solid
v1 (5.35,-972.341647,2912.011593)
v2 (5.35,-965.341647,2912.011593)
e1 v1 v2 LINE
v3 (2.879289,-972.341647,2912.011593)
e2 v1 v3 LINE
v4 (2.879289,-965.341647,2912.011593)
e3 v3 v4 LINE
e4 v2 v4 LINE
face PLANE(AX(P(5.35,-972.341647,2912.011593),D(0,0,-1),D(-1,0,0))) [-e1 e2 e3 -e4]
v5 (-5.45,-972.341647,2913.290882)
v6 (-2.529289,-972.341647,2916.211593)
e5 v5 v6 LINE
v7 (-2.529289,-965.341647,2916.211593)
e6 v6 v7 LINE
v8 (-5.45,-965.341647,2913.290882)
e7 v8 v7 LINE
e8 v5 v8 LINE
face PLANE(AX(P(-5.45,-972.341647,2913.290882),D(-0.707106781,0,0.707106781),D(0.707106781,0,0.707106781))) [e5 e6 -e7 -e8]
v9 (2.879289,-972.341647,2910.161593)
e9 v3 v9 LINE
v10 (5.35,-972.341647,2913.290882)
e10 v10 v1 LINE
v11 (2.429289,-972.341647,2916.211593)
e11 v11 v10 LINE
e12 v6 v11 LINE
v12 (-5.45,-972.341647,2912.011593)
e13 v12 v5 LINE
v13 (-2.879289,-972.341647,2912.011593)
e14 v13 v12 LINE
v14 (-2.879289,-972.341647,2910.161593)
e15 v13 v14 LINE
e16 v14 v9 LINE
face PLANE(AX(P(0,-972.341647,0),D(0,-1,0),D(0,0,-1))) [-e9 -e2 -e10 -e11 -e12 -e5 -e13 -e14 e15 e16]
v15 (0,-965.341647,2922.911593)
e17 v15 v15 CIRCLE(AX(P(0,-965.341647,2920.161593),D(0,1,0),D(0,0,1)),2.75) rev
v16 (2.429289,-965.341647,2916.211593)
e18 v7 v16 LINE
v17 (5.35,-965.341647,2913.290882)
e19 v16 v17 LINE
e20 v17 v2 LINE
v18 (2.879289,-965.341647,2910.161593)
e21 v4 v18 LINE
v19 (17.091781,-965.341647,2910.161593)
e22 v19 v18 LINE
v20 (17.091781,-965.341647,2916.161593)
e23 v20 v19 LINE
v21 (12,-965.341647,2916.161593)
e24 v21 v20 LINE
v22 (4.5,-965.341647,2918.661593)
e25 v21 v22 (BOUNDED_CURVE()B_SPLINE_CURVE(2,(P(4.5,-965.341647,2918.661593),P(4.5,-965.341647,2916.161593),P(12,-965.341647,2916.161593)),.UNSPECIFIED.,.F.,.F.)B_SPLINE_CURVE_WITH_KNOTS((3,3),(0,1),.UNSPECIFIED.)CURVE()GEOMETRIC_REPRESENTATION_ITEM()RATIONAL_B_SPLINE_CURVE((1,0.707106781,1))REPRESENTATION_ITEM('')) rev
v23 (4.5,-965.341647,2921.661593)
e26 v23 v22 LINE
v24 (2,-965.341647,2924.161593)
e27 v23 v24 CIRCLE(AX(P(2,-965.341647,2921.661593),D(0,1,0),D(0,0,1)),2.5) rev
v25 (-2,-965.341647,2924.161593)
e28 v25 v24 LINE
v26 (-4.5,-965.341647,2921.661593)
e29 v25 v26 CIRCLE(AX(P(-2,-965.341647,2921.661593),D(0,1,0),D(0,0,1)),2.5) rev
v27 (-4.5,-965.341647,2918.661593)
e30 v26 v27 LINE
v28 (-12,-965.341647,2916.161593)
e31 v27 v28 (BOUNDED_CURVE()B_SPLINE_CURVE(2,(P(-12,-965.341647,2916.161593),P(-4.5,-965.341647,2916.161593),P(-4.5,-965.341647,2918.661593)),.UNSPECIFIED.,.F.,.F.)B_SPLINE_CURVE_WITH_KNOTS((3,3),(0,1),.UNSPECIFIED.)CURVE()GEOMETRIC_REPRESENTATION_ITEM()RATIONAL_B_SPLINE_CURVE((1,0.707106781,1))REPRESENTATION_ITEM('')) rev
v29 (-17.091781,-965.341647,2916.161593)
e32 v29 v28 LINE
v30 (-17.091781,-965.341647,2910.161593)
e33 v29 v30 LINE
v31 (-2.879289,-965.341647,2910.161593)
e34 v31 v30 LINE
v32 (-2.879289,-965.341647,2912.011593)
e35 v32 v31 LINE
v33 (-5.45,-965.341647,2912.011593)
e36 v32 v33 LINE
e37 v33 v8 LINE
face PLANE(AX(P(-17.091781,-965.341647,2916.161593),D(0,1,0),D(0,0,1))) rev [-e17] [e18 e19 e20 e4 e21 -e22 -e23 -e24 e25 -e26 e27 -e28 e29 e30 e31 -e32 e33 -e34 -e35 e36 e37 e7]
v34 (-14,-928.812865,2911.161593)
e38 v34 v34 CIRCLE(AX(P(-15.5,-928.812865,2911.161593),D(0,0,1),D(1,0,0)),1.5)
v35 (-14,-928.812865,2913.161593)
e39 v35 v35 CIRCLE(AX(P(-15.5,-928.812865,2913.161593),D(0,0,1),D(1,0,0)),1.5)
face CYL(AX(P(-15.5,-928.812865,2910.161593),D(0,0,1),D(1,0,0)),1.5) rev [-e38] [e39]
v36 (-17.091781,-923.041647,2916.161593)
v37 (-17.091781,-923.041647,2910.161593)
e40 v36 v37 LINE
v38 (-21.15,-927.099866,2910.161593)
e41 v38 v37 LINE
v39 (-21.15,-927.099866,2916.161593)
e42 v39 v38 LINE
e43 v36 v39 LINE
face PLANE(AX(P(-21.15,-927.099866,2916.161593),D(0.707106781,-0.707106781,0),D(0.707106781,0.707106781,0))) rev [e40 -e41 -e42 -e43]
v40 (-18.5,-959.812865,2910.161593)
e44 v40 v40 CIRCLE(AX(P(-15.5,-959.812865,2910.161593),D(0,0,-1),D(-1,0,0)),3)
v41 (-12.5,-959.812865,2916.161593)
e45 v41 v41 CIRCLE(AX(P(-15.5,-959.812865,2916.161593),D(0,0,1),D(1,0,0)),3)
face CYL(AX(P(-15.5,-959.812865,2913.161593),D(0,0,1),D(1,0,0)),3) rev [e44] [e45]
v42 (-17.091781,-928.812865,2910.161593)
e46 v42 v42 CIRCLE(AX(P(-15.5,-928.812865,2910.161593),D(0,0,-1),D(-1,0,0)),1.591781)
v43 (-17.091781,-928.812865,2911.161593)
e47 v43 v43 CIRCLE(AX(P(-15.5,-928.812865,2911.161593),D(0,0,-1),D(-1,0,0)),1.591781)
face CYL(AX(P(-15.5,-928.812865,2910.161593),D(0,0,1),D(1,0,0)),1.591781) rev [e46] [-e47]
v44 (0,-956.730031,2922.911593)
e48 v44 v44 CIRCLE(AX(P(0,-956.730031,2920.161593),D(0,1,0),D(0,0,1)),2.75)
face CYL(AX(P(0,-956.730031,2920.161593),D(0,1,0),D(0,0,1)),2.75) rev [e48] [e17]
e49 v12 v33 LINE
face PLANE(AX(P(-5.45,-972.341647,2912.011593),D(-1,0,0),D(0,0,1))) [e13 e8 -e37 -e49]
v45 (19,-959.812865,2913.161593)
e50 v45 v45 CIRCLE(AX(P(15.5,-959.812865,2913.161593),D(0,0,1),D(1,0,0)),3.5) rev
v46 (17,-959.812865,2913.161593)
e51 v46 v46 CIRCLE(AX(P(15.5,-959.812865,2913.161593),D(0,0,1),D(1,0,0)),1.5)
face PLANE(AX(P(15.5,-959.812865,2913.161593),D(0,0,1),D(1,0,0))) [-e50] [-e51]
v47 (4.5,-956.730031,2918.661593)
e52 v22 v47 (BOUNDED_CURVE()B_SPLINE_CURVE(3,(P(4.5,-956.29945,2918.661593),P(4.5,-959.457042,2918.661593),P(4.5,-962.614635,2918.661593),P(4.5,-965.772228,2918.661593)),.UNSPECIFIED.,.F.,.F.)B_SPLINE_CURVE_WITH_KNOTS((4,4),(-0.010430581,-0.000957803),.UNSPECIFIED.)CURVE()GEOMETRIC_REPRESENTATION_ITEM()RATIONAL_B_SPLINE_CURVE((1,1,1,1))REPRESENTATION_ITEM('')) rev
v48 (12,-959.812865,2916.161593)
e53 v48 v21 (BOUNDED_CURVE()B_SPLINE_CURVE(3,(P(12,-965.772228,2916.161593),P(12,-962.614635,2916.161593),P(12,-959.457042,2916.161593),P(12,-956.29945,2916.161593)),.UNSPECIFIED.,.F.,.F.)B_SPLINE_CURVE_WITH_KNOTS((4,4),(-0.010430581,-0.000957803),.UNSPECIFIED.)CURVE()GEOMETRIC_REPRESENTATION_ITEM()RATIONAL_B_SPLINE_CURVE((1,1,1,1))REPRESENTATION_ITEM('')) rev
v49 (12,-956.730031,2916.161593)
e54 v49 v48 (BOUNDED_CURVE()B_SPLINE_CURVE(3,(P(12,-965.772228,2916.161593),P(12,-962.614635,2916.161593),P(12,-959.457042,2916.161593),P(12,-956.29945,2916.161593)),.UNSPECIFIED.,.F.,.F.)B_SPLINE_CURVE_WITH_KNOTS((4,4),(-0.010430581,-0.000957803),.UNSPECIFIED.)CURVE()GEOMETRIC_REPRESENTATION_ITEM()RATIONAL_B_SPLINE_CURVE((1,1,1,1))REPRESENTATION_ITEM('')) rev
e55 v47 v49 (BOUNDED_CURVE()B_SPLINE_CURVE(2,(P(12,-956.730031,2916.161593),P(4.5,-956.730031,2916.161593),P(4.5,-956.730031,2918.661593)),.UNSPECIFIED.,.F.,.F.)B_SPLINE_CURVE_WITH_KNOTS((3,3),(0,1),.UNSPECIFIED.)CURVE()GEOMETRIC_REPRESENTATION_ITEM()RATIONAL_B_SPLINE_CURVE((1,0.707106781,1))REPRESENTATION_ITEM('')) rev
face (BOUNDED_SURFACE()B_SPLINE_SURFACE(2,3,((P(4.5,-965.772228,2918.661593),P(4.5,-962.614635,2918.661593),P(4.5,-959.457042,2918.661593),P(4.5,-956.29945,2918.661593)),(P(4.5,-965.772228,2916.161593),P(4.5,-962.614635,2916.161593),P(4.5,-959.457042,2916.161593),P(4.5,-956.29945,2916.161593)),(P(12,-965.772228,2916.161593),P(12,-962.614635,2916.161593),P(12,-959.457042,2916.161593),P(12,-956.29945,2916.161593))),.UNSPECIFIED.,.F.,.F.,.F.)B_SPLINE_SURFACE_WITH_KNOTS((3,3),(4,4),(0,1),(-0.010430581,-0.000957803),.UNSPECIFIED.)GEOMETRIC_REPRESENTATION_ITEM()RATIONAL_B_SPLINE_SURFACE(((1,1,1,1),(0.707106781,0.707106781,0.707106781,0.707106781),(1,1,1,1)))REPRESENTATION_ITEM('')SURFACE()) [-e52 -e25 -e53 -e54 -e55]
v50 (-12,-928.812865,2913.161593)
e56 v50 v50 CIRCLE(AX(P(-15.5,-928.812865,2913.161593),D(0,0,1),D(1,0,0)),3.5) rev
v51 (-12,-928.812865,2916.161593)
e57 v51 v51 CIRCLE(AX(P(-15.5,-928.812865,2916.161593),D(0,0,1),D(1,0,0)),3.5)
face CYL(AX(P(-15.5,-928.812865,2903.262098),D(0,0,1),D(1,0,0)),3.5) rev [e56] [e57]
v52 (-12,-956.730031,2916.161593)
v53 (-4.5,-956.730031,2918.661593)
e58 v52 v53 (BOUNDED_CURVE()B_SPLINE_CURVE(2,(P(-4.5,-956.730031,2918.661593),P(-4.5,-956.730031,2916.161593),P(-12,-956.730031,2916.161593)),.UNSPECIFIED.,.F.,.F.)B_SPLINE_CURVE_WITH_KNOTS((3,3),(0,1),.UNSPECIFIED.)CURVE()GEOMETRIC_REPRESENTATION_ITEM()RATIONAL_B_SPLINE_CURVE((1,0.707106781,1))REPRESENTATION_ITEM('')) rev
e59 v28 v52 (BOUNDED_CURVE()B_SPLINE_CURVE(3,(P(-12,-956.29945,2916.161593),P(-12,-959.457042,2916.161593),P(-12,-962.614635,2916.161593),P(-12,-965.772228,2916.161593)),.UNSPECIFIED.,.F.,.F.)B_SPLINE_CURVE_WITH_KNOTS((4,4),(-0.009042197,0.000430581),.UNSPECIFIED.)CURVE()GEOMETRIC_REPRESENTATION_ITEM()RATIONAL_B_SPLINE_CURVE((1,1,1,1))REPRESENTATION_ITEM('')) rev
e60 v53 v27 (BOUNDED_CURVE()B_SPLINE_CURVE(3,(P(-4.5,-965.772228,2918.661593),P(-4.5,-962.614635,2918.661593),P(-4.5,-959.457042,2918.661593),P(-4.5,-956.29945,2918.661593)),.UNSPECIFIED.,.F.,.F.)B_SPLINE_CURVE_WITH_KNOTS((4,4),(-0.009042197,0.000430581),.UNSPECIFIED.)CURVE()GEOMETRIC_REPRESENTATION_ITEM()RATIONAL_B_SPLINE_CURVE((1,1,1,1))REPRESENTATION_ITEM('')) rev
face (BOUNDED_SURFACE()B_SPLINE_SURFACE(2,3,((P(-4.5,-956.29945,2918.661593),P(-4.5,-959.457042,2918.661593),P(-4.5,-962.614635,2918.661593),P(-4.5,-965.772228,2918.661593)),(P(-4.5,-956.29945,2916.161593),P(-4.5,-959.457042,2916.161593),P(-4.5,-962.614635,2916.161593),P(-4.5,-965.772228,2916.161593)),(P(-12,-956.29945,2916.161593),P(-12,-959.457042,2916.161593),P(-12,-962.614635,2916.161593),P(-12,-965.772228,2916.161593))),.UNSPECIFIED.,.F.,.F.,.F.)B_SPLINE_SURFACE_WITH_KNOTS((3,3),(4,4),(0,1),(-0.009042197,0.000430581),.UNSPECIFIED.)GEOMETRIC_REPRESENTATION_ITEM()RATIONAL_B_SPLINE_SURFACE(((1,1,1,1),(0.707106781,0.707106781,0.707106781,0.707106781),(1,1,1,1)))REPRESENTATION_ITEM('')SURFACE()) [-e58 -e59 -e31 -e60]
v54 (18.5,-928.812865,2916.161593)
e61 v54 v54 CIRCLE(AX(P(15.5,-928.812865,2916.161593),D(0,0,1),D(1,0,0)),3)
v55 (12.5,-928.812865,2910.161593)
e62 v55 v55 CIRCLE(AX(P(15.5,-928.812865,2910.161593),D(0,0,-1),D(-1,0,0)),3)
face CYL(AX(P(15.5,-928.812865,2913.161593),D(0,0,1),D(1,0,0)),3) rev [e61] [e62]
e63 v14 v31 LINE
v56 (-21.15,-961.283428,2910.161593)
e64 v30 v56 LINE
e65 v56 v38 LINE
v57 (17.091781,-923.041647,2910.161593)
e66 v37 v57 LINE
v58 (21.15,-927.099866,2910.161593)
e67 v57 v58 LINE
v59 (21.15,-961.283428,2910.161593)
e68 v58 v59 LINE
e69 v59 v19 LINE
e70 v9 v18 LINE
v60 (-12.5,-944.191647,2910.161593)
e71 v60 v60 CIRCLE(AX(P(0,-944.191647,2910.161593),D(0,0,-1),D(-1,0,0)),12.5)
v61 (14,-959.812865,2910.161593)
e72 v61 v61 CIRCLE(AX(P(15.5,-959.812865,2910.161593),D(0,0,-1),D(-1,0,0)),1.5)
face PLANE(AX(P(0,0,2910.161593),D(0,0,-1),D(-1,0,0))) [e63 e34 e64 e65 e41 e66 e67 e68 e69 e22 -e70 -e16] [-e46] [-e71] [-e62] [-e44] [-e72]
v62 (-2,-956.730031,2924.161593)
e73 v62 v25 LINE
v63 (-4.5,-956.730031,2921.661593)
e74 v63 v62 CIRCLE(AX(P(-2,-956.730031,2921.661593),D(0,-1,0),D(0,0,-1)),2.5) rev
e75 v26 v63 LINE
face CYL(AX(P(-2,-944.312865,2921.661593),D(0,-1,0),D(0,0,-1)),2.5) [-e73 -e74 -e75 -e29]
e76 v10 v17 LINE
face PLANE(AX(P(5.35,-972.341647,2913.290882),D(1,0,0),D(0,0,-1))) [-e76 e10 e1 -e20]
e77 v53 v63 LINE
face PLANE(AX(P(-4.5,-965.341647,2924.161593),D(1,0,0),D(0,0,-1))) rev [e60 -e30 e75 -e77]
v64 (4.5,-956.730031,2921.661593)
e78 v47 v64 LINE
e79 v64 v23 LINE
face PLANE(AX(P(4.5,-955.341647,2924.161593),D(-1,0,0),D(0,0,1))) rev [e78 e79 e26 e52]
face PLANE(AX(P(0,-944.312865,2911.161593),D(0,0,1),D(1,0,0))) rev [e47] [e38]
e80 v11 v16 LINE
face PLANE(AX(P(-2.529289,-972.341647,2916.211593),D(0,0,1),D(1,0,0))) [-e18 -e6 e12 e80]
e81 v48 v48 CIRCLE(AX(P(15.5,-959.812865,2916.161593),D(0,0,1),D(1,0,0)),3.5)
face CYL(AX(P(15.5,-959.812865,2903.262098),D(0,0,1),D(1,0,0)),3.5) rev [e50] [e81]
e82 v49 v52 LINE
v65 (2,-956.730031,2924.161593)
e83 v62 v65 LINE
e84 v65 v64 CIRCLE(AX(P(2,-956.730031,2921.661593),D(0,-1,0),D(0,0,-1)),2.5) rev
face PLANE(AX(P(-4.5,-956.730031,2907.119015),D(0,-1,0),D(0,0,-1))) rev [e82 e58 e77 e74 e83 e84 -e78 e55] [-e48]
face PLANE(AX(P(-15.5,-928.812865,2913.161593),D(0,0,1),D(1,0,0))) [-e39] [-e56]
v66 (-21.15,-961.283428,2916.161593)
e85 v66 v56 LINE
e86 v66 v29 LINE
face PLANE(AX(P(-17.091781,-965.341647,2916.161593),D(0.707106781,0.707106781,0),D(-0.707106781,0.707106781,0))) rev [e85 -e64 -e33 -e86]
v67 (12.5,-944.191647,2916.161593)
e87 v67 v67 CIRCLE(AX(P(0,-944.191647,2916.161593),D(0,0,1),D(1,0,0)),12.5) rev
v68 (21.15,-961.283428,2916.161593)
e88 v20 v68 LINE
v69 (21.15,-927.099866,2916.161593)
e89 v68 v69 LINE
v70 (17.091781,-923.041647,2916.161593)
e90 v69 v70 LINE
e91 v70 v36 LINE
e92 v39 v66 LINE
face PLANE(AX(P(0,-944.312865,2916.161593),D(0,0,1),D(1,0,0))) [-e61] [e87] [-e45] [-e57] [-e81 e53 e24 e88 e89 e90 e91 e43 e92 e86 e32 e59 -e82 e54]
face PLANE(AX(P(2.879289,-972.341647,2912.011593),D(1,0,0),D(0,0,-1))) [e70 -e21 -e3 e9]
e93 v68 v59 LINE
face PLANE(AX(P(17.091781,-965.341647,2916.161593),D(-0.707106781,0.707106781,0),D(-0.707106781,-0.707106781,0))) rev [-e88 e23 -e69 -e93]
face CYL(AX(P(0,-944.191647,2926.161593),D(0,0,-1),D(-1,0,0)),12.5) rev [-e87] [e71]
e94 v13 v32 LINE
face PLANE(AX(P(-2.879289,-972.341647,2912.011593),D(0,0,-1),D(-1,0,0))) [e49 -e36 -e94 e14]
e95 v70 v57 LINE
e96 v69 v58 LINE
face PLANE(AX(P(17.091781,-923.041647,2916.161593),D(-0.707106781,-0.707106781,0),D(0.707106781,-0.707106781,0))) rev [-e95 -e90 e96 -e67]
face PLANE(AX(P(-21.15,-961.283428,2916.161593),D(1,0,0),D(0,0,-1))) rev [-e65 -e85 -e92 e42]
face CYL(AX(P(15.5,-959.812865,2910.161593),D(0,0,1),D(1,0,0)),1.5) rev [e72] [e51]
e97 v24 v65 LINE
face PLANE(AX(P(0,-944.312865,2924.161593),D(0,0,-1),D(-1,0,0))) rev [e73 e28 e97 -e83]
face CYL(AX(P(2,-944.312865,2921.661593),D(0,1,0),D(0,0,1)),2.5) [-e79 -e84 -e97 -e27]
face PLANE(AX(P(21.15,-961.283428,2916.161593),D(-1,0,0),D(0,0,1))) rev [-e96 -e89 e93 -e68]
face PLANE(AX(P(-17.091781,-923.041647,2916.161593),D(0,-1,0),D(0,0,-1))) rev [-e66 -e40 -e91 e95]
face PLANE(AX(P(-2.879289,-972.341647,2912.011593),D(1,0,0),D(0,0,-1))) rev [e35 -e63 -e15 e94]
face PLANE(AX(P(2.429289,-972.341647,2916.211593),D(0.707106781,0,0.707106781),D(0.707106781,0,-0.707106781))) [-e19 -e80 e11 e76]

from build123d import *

# Parameters (mm, degrees)
SKETCH1_R                    = 11025
BOSS_EXTRUDE1_DEPTH          = 5000
BOSS_EXTRUDE2_DEPTH          = 8000
SKETCH4_R                    = 3000
CUT_EXTRUDE2_DEPTH           = 3000
SKETCH5_R                    = 1500
CUT_EXTRUDE3_DEPTH           = 3000
SKETCH6_R                    = 3000
CUT_EXTRUDE4_DEPTH           = 3000
SKETCH3_R                    = 2900
CUT_EXTRUDE1_DEPTH           = 12018
SCALE6_SCALE                 = 0.001
CORTAR_EXTRUIR1_DEPTH        = 10
CORTAR_EXTRUIR1_DEPTH_BACK   = 10
CROQUIS1_R                   = 12.5
CROQUIS2_W                   = 9
CROQUIS2_H                   = 0.876479878
CORTAR_EXTRUIR2_DEPTH        = 8
CROQUIS4_R                   = 2.9
CROQUIS4_R_2                 = 2.4
SALIENTE_EXTRUIR2_DEPTH      = 8.611616332
CROQUIS5_R                   = 3.5
CORTAR_EXTRUIR3_DEPTH        = 3
CROQUIS6_R                   = 1.591781054
CROQUIS6_R_2                 = 3
CROQUIS6_R_3                 = 1.5
CROQUIS6_R_4                 = 12.5
SALIENTE_EXTRUIR3_DEPTH      = 1
REDONDEO1_R                  = 2.5
TALADRO_DE_MARGEN_PARA_M51_D = 5.5
SALIENTE_EXTRUIR4_DEPTH      = 7
REDONDEO2_SIZE               = 2.5
REDONDEO2_SIZE_2             = 7.5


with BuildPart() as part:
    # Sketch1 → Boss-Extrude1 (new body)
    with BuildSketch(Plane.XY):
        Polygon((-21150, 17212.99935917), (-17091.781053823, 21271.218305346), (17091.781053823, 21271.218305346), (21150, 17212.99935917), (21150, -16970.562748477), (17091.781053823, -21028.781694654), (-17091.781053823, -21028.781694654), (-21150, -16970.562748477), align=None)
        with Locations((0, 121.218305346)):
            Circle(SKETCH1_R, mode=Mode.SUBTRACT)
    extrude(amount=BOSS_EXTRUDE1_DEPTH)

    # Sketch2 → Boss-Extrude2 (add)
    with BuildSketch(Plane.XY.offset(5000)):
        Polygon((0, -11028.781694654), (4500, -11028.781694654), (4500, -21028.781694654), (-4500, -21028.781694654), (-4500, -11028.781694654), align=None)
    extrude(amount=BOSS_EXTRUDE2_DEPTH)

    # Sketch4 → Cut-Extrude2 (cut)
    with BuildSketch(Plane.XY.offset(5000)):
        with Locations((-15500, 15500)):
            Circle(SKETCH4_R)
        with Locations((15500, 15500)):
            Circle(SKETCH4_R)
        with Locations((15500, -15500)):
            Circle(SKETCH4_R)
        with Locations((-15500, -15500)):
            Circle(SKETCH4_R)
    extrude(amount=-CUT_EXTRUDE2_DEPTH, mode=Mode.SUBTRACT)

    # Sketch5 → Cut-Extrude3 (cut)
    with BuildSketch(Plane.XY.offset(2000)):
        with Locations((-15500, 15500)):
            Circle(SKETCH5_R)
        with Locations((15500, -15500)):
            Circle(SKETCH5_R)
    extrude(amount=-CUT_EXTRUDE3_DEPTH, mode=Mode.SUBTRACT)

    # Sketch6 → Cut-Extrude4 (cut)
    with BuildSketch(Plane.XY.offset(2000)):
        with Locations((15500, 15500)):
            Circle(SKETCH6_R)
        with Locations((-15500, -15500)):
            Circle(SKETCH6_R)
    extrude(amount=-CUT_EXTRUDE4_DEPTH, mode=Mode.SUBTRACT)

    # Sketch3 → Cut-Extrude1 (cut)
    with BuildSketch(Plane.XZ.offset(21028.781694654)):
        with Locations(Location((0, 9000, 0), (0, 0, 270))):
            Circle(SKETCH3_R)
    extrude(amount=-CUT_EXTRUDE1_DEPTH, mode=Mode.SUBTRACT)


with BuildPart() as part_1:
    # Scale6: scaled about (0, -945.258123271, 2914.075668663)
    add(part.part.scale(SCALE6_SCALE).moved(Location((0, -944.312865148, 2911.161592994))))

    # Croquis1 → Cortar-Extruir1 (cut, two sides: drawn at the far end of the back side and taken through both)
    with BuildSketch(Plane.XY.offset(2916.161592994).offset(-CORTAR_EXTRUIR1_DEPTH_BACK)):
        with Locations(Location((0, -944.191646843, 0), (0, 0, 248.899803976))):
            Circle(CROQUIS1_R)
    extrude(amount=CORTAR_EXTRUIR1_DEPTH + CORTAR_EXTRUIR1_DEPTH_BACK, mode=Mode.SUBTRACT)

    # Croquis2 → Cortar-Extruir2 (cut)
    with BuildSketch(Plane.XY.offset(2924.161592994)):
        with Locations((0, -956.291790571)):
            Rectangle(CROQUIS2_W, CROQUIS2_H)
    extrude(amount=-CORTAR_EXTRUIR2_DEPTH, mode=Mode.SUBTRACT)

    # Croquis4 → Saliente-Extruir2 (add)
    with BuildSketch(Plane.XZ.offset(965.341646843)):
        with Locations((0, 2920.161592994)):
            Circle(CROQUIS4_R)
        with Locations(Location((0, 2920.161592994, 0), (0, 0, 270))):
            Circle(CROQUIS4_R_2, mode=Mode.SUBTRACT)
    extrude(amount=-SALIENTE_EXTRUIR2_DEPTH)

    # Croquis5 → Cortar-Extruir3 (cut)
    with BuildSketch(Plane.XY.offset(2916.161592994)):
        with Locations((-15.5, -928.812865148)):
            Circle(CROQUIS5_R)
        with Locations((15.5, -959.812865148)):
            Circle(CROQUIS5_R)
    extrude(amount=-CORTAR_EXTRUIR3_DEPTH, mode=Mode.SUBTRACT)

    # Croquis6 → Saliente-Extruir3 (add)
    with BuildSketch(Plane(origin=(0, 0, 2911.161592994), x_dir=(-1, 0, 0), z_dir=(0, 0, -1))):
        Polygon((17.091781054, -923.041646843), (-17.091781054, -923.041646843), (-21.15, -927.099865789), (-21.15, -961.283427896), (-17.091781054, -965.341646843), (17.091781054, -965.341646843), (21.15, -961.283427896), (21.15, -927.099865789), align=None)
        with Locations((15.5, -928.812865148)):
            Circle(CROQUIS6_R, mode=Mode.SUBTRACT)
        with Locations(Location((-15.5, -928.812865148, 0), (0, 0, 180))):
            Circle(CROQUIS6_R_2, mode=Mode.SUBTRACT)
        with Locations(Location((-15.5, -959.812865148, 0), (0, 0, 180))):
            Circle(CROQUIS6_R_3, mode=Mode.SUBTRACT)
        with Locations(Location((15.5, -959.812865148, 0), (0, 0, 180))):
            Circle(CROQUIS6_R_2, mode=Mode.SUBTRACT)
        with Locations((0, -944.191646843)):
            Circle(CROQUIS6_R_4, mode=Mode.SUBTRACT)
    extrude(amount=SALIENTE_EXTRUIR3_DEPTH)

    # Redondeo1
    redondeo1_edges = [part_1.edges().sort_by_distance(p)[0] for p in [
        (4.5, -961.035838676, 2924.161592994),
        (-4.5, -961.035838676, 2924.161592994),
    ]]
    fillet(redondeo1_edges, radius=REDONDEO1_R)

    # Taladro de margen para M51 (through all)
    with Locations(Plane(origin=(0, -956.73003051, 2920.161592994), x_dir=(0, 0, 1), z_dir=(0, 1, 0))):
        with Locations((0, 0)):
            Hole(TALADRO_DE_MARGEN_PARA_M51_D / 2)

    # Croquis8 → Saliente-Extruir4 (add)
    with BuildSketch(Plane.XZ.offset(965.341646843)):
        Polygon((-2.879289322, 2912.011592994), (-5.45, 2912.011592994), (-5.45, 2913.290882316), (-2.529289322, 2916.211592994), (2.429289322, 2916.211592994), (5.35, 2913.290882316), (5.35, 2912.011592994), (2.879289322, 2912.011592994), (2.879289322, 2910.161592994), (-2.879289322, 2910.161592994), align=None)
    extrude(amount=SALIENTE_EXTRUIR4_DEPTH)

    # Redondeo2
    # an asymmetric fillet: 7.5, 2.5 mm, written as the material it adds along each edge
    with BuildSketch(Plane(origin=(4.5, -956.73003051, 2916.161592994), x_dir=(0, 0, 1), z_dir=(0, -1, 0))) as redondeo2_piece_1:
        with BuildLine():
            Bezier((REDONDEO2_SIZE, 0), (0, 0), (0, -REDONDEO2_SIZE_2), weights=[1, 0.707106781, 1])
            Line((0, -REDONDEO2_SIZE_2), (0, 0))
            Line((0, 0), (REDONDEO2_SIZE, 0))
        make_face()
    extrude(amount=8.611616332)
    with BuildSketch(Plane(origin=(-4.5, -965.341646842, 2916.161592994), x_dir=(-1, 0, 0), z_dir=(0, 1, 0))) as redondeo2_piece_2:
        with BuildLine():
            Bezier((REDONDEO2_SIZE_2, 0), (0, 0), (0, REDONDEO2_SIZE), weights=[1, 0.707106781, 1])
            Line((0, REDONDEO2_SIZE), (0, 0))
            Line((0, 0), (REDONDEO2_SIZE_2, 0))
        make_face()
    extrude(amount=8.611616332)


solid = part_1.part
